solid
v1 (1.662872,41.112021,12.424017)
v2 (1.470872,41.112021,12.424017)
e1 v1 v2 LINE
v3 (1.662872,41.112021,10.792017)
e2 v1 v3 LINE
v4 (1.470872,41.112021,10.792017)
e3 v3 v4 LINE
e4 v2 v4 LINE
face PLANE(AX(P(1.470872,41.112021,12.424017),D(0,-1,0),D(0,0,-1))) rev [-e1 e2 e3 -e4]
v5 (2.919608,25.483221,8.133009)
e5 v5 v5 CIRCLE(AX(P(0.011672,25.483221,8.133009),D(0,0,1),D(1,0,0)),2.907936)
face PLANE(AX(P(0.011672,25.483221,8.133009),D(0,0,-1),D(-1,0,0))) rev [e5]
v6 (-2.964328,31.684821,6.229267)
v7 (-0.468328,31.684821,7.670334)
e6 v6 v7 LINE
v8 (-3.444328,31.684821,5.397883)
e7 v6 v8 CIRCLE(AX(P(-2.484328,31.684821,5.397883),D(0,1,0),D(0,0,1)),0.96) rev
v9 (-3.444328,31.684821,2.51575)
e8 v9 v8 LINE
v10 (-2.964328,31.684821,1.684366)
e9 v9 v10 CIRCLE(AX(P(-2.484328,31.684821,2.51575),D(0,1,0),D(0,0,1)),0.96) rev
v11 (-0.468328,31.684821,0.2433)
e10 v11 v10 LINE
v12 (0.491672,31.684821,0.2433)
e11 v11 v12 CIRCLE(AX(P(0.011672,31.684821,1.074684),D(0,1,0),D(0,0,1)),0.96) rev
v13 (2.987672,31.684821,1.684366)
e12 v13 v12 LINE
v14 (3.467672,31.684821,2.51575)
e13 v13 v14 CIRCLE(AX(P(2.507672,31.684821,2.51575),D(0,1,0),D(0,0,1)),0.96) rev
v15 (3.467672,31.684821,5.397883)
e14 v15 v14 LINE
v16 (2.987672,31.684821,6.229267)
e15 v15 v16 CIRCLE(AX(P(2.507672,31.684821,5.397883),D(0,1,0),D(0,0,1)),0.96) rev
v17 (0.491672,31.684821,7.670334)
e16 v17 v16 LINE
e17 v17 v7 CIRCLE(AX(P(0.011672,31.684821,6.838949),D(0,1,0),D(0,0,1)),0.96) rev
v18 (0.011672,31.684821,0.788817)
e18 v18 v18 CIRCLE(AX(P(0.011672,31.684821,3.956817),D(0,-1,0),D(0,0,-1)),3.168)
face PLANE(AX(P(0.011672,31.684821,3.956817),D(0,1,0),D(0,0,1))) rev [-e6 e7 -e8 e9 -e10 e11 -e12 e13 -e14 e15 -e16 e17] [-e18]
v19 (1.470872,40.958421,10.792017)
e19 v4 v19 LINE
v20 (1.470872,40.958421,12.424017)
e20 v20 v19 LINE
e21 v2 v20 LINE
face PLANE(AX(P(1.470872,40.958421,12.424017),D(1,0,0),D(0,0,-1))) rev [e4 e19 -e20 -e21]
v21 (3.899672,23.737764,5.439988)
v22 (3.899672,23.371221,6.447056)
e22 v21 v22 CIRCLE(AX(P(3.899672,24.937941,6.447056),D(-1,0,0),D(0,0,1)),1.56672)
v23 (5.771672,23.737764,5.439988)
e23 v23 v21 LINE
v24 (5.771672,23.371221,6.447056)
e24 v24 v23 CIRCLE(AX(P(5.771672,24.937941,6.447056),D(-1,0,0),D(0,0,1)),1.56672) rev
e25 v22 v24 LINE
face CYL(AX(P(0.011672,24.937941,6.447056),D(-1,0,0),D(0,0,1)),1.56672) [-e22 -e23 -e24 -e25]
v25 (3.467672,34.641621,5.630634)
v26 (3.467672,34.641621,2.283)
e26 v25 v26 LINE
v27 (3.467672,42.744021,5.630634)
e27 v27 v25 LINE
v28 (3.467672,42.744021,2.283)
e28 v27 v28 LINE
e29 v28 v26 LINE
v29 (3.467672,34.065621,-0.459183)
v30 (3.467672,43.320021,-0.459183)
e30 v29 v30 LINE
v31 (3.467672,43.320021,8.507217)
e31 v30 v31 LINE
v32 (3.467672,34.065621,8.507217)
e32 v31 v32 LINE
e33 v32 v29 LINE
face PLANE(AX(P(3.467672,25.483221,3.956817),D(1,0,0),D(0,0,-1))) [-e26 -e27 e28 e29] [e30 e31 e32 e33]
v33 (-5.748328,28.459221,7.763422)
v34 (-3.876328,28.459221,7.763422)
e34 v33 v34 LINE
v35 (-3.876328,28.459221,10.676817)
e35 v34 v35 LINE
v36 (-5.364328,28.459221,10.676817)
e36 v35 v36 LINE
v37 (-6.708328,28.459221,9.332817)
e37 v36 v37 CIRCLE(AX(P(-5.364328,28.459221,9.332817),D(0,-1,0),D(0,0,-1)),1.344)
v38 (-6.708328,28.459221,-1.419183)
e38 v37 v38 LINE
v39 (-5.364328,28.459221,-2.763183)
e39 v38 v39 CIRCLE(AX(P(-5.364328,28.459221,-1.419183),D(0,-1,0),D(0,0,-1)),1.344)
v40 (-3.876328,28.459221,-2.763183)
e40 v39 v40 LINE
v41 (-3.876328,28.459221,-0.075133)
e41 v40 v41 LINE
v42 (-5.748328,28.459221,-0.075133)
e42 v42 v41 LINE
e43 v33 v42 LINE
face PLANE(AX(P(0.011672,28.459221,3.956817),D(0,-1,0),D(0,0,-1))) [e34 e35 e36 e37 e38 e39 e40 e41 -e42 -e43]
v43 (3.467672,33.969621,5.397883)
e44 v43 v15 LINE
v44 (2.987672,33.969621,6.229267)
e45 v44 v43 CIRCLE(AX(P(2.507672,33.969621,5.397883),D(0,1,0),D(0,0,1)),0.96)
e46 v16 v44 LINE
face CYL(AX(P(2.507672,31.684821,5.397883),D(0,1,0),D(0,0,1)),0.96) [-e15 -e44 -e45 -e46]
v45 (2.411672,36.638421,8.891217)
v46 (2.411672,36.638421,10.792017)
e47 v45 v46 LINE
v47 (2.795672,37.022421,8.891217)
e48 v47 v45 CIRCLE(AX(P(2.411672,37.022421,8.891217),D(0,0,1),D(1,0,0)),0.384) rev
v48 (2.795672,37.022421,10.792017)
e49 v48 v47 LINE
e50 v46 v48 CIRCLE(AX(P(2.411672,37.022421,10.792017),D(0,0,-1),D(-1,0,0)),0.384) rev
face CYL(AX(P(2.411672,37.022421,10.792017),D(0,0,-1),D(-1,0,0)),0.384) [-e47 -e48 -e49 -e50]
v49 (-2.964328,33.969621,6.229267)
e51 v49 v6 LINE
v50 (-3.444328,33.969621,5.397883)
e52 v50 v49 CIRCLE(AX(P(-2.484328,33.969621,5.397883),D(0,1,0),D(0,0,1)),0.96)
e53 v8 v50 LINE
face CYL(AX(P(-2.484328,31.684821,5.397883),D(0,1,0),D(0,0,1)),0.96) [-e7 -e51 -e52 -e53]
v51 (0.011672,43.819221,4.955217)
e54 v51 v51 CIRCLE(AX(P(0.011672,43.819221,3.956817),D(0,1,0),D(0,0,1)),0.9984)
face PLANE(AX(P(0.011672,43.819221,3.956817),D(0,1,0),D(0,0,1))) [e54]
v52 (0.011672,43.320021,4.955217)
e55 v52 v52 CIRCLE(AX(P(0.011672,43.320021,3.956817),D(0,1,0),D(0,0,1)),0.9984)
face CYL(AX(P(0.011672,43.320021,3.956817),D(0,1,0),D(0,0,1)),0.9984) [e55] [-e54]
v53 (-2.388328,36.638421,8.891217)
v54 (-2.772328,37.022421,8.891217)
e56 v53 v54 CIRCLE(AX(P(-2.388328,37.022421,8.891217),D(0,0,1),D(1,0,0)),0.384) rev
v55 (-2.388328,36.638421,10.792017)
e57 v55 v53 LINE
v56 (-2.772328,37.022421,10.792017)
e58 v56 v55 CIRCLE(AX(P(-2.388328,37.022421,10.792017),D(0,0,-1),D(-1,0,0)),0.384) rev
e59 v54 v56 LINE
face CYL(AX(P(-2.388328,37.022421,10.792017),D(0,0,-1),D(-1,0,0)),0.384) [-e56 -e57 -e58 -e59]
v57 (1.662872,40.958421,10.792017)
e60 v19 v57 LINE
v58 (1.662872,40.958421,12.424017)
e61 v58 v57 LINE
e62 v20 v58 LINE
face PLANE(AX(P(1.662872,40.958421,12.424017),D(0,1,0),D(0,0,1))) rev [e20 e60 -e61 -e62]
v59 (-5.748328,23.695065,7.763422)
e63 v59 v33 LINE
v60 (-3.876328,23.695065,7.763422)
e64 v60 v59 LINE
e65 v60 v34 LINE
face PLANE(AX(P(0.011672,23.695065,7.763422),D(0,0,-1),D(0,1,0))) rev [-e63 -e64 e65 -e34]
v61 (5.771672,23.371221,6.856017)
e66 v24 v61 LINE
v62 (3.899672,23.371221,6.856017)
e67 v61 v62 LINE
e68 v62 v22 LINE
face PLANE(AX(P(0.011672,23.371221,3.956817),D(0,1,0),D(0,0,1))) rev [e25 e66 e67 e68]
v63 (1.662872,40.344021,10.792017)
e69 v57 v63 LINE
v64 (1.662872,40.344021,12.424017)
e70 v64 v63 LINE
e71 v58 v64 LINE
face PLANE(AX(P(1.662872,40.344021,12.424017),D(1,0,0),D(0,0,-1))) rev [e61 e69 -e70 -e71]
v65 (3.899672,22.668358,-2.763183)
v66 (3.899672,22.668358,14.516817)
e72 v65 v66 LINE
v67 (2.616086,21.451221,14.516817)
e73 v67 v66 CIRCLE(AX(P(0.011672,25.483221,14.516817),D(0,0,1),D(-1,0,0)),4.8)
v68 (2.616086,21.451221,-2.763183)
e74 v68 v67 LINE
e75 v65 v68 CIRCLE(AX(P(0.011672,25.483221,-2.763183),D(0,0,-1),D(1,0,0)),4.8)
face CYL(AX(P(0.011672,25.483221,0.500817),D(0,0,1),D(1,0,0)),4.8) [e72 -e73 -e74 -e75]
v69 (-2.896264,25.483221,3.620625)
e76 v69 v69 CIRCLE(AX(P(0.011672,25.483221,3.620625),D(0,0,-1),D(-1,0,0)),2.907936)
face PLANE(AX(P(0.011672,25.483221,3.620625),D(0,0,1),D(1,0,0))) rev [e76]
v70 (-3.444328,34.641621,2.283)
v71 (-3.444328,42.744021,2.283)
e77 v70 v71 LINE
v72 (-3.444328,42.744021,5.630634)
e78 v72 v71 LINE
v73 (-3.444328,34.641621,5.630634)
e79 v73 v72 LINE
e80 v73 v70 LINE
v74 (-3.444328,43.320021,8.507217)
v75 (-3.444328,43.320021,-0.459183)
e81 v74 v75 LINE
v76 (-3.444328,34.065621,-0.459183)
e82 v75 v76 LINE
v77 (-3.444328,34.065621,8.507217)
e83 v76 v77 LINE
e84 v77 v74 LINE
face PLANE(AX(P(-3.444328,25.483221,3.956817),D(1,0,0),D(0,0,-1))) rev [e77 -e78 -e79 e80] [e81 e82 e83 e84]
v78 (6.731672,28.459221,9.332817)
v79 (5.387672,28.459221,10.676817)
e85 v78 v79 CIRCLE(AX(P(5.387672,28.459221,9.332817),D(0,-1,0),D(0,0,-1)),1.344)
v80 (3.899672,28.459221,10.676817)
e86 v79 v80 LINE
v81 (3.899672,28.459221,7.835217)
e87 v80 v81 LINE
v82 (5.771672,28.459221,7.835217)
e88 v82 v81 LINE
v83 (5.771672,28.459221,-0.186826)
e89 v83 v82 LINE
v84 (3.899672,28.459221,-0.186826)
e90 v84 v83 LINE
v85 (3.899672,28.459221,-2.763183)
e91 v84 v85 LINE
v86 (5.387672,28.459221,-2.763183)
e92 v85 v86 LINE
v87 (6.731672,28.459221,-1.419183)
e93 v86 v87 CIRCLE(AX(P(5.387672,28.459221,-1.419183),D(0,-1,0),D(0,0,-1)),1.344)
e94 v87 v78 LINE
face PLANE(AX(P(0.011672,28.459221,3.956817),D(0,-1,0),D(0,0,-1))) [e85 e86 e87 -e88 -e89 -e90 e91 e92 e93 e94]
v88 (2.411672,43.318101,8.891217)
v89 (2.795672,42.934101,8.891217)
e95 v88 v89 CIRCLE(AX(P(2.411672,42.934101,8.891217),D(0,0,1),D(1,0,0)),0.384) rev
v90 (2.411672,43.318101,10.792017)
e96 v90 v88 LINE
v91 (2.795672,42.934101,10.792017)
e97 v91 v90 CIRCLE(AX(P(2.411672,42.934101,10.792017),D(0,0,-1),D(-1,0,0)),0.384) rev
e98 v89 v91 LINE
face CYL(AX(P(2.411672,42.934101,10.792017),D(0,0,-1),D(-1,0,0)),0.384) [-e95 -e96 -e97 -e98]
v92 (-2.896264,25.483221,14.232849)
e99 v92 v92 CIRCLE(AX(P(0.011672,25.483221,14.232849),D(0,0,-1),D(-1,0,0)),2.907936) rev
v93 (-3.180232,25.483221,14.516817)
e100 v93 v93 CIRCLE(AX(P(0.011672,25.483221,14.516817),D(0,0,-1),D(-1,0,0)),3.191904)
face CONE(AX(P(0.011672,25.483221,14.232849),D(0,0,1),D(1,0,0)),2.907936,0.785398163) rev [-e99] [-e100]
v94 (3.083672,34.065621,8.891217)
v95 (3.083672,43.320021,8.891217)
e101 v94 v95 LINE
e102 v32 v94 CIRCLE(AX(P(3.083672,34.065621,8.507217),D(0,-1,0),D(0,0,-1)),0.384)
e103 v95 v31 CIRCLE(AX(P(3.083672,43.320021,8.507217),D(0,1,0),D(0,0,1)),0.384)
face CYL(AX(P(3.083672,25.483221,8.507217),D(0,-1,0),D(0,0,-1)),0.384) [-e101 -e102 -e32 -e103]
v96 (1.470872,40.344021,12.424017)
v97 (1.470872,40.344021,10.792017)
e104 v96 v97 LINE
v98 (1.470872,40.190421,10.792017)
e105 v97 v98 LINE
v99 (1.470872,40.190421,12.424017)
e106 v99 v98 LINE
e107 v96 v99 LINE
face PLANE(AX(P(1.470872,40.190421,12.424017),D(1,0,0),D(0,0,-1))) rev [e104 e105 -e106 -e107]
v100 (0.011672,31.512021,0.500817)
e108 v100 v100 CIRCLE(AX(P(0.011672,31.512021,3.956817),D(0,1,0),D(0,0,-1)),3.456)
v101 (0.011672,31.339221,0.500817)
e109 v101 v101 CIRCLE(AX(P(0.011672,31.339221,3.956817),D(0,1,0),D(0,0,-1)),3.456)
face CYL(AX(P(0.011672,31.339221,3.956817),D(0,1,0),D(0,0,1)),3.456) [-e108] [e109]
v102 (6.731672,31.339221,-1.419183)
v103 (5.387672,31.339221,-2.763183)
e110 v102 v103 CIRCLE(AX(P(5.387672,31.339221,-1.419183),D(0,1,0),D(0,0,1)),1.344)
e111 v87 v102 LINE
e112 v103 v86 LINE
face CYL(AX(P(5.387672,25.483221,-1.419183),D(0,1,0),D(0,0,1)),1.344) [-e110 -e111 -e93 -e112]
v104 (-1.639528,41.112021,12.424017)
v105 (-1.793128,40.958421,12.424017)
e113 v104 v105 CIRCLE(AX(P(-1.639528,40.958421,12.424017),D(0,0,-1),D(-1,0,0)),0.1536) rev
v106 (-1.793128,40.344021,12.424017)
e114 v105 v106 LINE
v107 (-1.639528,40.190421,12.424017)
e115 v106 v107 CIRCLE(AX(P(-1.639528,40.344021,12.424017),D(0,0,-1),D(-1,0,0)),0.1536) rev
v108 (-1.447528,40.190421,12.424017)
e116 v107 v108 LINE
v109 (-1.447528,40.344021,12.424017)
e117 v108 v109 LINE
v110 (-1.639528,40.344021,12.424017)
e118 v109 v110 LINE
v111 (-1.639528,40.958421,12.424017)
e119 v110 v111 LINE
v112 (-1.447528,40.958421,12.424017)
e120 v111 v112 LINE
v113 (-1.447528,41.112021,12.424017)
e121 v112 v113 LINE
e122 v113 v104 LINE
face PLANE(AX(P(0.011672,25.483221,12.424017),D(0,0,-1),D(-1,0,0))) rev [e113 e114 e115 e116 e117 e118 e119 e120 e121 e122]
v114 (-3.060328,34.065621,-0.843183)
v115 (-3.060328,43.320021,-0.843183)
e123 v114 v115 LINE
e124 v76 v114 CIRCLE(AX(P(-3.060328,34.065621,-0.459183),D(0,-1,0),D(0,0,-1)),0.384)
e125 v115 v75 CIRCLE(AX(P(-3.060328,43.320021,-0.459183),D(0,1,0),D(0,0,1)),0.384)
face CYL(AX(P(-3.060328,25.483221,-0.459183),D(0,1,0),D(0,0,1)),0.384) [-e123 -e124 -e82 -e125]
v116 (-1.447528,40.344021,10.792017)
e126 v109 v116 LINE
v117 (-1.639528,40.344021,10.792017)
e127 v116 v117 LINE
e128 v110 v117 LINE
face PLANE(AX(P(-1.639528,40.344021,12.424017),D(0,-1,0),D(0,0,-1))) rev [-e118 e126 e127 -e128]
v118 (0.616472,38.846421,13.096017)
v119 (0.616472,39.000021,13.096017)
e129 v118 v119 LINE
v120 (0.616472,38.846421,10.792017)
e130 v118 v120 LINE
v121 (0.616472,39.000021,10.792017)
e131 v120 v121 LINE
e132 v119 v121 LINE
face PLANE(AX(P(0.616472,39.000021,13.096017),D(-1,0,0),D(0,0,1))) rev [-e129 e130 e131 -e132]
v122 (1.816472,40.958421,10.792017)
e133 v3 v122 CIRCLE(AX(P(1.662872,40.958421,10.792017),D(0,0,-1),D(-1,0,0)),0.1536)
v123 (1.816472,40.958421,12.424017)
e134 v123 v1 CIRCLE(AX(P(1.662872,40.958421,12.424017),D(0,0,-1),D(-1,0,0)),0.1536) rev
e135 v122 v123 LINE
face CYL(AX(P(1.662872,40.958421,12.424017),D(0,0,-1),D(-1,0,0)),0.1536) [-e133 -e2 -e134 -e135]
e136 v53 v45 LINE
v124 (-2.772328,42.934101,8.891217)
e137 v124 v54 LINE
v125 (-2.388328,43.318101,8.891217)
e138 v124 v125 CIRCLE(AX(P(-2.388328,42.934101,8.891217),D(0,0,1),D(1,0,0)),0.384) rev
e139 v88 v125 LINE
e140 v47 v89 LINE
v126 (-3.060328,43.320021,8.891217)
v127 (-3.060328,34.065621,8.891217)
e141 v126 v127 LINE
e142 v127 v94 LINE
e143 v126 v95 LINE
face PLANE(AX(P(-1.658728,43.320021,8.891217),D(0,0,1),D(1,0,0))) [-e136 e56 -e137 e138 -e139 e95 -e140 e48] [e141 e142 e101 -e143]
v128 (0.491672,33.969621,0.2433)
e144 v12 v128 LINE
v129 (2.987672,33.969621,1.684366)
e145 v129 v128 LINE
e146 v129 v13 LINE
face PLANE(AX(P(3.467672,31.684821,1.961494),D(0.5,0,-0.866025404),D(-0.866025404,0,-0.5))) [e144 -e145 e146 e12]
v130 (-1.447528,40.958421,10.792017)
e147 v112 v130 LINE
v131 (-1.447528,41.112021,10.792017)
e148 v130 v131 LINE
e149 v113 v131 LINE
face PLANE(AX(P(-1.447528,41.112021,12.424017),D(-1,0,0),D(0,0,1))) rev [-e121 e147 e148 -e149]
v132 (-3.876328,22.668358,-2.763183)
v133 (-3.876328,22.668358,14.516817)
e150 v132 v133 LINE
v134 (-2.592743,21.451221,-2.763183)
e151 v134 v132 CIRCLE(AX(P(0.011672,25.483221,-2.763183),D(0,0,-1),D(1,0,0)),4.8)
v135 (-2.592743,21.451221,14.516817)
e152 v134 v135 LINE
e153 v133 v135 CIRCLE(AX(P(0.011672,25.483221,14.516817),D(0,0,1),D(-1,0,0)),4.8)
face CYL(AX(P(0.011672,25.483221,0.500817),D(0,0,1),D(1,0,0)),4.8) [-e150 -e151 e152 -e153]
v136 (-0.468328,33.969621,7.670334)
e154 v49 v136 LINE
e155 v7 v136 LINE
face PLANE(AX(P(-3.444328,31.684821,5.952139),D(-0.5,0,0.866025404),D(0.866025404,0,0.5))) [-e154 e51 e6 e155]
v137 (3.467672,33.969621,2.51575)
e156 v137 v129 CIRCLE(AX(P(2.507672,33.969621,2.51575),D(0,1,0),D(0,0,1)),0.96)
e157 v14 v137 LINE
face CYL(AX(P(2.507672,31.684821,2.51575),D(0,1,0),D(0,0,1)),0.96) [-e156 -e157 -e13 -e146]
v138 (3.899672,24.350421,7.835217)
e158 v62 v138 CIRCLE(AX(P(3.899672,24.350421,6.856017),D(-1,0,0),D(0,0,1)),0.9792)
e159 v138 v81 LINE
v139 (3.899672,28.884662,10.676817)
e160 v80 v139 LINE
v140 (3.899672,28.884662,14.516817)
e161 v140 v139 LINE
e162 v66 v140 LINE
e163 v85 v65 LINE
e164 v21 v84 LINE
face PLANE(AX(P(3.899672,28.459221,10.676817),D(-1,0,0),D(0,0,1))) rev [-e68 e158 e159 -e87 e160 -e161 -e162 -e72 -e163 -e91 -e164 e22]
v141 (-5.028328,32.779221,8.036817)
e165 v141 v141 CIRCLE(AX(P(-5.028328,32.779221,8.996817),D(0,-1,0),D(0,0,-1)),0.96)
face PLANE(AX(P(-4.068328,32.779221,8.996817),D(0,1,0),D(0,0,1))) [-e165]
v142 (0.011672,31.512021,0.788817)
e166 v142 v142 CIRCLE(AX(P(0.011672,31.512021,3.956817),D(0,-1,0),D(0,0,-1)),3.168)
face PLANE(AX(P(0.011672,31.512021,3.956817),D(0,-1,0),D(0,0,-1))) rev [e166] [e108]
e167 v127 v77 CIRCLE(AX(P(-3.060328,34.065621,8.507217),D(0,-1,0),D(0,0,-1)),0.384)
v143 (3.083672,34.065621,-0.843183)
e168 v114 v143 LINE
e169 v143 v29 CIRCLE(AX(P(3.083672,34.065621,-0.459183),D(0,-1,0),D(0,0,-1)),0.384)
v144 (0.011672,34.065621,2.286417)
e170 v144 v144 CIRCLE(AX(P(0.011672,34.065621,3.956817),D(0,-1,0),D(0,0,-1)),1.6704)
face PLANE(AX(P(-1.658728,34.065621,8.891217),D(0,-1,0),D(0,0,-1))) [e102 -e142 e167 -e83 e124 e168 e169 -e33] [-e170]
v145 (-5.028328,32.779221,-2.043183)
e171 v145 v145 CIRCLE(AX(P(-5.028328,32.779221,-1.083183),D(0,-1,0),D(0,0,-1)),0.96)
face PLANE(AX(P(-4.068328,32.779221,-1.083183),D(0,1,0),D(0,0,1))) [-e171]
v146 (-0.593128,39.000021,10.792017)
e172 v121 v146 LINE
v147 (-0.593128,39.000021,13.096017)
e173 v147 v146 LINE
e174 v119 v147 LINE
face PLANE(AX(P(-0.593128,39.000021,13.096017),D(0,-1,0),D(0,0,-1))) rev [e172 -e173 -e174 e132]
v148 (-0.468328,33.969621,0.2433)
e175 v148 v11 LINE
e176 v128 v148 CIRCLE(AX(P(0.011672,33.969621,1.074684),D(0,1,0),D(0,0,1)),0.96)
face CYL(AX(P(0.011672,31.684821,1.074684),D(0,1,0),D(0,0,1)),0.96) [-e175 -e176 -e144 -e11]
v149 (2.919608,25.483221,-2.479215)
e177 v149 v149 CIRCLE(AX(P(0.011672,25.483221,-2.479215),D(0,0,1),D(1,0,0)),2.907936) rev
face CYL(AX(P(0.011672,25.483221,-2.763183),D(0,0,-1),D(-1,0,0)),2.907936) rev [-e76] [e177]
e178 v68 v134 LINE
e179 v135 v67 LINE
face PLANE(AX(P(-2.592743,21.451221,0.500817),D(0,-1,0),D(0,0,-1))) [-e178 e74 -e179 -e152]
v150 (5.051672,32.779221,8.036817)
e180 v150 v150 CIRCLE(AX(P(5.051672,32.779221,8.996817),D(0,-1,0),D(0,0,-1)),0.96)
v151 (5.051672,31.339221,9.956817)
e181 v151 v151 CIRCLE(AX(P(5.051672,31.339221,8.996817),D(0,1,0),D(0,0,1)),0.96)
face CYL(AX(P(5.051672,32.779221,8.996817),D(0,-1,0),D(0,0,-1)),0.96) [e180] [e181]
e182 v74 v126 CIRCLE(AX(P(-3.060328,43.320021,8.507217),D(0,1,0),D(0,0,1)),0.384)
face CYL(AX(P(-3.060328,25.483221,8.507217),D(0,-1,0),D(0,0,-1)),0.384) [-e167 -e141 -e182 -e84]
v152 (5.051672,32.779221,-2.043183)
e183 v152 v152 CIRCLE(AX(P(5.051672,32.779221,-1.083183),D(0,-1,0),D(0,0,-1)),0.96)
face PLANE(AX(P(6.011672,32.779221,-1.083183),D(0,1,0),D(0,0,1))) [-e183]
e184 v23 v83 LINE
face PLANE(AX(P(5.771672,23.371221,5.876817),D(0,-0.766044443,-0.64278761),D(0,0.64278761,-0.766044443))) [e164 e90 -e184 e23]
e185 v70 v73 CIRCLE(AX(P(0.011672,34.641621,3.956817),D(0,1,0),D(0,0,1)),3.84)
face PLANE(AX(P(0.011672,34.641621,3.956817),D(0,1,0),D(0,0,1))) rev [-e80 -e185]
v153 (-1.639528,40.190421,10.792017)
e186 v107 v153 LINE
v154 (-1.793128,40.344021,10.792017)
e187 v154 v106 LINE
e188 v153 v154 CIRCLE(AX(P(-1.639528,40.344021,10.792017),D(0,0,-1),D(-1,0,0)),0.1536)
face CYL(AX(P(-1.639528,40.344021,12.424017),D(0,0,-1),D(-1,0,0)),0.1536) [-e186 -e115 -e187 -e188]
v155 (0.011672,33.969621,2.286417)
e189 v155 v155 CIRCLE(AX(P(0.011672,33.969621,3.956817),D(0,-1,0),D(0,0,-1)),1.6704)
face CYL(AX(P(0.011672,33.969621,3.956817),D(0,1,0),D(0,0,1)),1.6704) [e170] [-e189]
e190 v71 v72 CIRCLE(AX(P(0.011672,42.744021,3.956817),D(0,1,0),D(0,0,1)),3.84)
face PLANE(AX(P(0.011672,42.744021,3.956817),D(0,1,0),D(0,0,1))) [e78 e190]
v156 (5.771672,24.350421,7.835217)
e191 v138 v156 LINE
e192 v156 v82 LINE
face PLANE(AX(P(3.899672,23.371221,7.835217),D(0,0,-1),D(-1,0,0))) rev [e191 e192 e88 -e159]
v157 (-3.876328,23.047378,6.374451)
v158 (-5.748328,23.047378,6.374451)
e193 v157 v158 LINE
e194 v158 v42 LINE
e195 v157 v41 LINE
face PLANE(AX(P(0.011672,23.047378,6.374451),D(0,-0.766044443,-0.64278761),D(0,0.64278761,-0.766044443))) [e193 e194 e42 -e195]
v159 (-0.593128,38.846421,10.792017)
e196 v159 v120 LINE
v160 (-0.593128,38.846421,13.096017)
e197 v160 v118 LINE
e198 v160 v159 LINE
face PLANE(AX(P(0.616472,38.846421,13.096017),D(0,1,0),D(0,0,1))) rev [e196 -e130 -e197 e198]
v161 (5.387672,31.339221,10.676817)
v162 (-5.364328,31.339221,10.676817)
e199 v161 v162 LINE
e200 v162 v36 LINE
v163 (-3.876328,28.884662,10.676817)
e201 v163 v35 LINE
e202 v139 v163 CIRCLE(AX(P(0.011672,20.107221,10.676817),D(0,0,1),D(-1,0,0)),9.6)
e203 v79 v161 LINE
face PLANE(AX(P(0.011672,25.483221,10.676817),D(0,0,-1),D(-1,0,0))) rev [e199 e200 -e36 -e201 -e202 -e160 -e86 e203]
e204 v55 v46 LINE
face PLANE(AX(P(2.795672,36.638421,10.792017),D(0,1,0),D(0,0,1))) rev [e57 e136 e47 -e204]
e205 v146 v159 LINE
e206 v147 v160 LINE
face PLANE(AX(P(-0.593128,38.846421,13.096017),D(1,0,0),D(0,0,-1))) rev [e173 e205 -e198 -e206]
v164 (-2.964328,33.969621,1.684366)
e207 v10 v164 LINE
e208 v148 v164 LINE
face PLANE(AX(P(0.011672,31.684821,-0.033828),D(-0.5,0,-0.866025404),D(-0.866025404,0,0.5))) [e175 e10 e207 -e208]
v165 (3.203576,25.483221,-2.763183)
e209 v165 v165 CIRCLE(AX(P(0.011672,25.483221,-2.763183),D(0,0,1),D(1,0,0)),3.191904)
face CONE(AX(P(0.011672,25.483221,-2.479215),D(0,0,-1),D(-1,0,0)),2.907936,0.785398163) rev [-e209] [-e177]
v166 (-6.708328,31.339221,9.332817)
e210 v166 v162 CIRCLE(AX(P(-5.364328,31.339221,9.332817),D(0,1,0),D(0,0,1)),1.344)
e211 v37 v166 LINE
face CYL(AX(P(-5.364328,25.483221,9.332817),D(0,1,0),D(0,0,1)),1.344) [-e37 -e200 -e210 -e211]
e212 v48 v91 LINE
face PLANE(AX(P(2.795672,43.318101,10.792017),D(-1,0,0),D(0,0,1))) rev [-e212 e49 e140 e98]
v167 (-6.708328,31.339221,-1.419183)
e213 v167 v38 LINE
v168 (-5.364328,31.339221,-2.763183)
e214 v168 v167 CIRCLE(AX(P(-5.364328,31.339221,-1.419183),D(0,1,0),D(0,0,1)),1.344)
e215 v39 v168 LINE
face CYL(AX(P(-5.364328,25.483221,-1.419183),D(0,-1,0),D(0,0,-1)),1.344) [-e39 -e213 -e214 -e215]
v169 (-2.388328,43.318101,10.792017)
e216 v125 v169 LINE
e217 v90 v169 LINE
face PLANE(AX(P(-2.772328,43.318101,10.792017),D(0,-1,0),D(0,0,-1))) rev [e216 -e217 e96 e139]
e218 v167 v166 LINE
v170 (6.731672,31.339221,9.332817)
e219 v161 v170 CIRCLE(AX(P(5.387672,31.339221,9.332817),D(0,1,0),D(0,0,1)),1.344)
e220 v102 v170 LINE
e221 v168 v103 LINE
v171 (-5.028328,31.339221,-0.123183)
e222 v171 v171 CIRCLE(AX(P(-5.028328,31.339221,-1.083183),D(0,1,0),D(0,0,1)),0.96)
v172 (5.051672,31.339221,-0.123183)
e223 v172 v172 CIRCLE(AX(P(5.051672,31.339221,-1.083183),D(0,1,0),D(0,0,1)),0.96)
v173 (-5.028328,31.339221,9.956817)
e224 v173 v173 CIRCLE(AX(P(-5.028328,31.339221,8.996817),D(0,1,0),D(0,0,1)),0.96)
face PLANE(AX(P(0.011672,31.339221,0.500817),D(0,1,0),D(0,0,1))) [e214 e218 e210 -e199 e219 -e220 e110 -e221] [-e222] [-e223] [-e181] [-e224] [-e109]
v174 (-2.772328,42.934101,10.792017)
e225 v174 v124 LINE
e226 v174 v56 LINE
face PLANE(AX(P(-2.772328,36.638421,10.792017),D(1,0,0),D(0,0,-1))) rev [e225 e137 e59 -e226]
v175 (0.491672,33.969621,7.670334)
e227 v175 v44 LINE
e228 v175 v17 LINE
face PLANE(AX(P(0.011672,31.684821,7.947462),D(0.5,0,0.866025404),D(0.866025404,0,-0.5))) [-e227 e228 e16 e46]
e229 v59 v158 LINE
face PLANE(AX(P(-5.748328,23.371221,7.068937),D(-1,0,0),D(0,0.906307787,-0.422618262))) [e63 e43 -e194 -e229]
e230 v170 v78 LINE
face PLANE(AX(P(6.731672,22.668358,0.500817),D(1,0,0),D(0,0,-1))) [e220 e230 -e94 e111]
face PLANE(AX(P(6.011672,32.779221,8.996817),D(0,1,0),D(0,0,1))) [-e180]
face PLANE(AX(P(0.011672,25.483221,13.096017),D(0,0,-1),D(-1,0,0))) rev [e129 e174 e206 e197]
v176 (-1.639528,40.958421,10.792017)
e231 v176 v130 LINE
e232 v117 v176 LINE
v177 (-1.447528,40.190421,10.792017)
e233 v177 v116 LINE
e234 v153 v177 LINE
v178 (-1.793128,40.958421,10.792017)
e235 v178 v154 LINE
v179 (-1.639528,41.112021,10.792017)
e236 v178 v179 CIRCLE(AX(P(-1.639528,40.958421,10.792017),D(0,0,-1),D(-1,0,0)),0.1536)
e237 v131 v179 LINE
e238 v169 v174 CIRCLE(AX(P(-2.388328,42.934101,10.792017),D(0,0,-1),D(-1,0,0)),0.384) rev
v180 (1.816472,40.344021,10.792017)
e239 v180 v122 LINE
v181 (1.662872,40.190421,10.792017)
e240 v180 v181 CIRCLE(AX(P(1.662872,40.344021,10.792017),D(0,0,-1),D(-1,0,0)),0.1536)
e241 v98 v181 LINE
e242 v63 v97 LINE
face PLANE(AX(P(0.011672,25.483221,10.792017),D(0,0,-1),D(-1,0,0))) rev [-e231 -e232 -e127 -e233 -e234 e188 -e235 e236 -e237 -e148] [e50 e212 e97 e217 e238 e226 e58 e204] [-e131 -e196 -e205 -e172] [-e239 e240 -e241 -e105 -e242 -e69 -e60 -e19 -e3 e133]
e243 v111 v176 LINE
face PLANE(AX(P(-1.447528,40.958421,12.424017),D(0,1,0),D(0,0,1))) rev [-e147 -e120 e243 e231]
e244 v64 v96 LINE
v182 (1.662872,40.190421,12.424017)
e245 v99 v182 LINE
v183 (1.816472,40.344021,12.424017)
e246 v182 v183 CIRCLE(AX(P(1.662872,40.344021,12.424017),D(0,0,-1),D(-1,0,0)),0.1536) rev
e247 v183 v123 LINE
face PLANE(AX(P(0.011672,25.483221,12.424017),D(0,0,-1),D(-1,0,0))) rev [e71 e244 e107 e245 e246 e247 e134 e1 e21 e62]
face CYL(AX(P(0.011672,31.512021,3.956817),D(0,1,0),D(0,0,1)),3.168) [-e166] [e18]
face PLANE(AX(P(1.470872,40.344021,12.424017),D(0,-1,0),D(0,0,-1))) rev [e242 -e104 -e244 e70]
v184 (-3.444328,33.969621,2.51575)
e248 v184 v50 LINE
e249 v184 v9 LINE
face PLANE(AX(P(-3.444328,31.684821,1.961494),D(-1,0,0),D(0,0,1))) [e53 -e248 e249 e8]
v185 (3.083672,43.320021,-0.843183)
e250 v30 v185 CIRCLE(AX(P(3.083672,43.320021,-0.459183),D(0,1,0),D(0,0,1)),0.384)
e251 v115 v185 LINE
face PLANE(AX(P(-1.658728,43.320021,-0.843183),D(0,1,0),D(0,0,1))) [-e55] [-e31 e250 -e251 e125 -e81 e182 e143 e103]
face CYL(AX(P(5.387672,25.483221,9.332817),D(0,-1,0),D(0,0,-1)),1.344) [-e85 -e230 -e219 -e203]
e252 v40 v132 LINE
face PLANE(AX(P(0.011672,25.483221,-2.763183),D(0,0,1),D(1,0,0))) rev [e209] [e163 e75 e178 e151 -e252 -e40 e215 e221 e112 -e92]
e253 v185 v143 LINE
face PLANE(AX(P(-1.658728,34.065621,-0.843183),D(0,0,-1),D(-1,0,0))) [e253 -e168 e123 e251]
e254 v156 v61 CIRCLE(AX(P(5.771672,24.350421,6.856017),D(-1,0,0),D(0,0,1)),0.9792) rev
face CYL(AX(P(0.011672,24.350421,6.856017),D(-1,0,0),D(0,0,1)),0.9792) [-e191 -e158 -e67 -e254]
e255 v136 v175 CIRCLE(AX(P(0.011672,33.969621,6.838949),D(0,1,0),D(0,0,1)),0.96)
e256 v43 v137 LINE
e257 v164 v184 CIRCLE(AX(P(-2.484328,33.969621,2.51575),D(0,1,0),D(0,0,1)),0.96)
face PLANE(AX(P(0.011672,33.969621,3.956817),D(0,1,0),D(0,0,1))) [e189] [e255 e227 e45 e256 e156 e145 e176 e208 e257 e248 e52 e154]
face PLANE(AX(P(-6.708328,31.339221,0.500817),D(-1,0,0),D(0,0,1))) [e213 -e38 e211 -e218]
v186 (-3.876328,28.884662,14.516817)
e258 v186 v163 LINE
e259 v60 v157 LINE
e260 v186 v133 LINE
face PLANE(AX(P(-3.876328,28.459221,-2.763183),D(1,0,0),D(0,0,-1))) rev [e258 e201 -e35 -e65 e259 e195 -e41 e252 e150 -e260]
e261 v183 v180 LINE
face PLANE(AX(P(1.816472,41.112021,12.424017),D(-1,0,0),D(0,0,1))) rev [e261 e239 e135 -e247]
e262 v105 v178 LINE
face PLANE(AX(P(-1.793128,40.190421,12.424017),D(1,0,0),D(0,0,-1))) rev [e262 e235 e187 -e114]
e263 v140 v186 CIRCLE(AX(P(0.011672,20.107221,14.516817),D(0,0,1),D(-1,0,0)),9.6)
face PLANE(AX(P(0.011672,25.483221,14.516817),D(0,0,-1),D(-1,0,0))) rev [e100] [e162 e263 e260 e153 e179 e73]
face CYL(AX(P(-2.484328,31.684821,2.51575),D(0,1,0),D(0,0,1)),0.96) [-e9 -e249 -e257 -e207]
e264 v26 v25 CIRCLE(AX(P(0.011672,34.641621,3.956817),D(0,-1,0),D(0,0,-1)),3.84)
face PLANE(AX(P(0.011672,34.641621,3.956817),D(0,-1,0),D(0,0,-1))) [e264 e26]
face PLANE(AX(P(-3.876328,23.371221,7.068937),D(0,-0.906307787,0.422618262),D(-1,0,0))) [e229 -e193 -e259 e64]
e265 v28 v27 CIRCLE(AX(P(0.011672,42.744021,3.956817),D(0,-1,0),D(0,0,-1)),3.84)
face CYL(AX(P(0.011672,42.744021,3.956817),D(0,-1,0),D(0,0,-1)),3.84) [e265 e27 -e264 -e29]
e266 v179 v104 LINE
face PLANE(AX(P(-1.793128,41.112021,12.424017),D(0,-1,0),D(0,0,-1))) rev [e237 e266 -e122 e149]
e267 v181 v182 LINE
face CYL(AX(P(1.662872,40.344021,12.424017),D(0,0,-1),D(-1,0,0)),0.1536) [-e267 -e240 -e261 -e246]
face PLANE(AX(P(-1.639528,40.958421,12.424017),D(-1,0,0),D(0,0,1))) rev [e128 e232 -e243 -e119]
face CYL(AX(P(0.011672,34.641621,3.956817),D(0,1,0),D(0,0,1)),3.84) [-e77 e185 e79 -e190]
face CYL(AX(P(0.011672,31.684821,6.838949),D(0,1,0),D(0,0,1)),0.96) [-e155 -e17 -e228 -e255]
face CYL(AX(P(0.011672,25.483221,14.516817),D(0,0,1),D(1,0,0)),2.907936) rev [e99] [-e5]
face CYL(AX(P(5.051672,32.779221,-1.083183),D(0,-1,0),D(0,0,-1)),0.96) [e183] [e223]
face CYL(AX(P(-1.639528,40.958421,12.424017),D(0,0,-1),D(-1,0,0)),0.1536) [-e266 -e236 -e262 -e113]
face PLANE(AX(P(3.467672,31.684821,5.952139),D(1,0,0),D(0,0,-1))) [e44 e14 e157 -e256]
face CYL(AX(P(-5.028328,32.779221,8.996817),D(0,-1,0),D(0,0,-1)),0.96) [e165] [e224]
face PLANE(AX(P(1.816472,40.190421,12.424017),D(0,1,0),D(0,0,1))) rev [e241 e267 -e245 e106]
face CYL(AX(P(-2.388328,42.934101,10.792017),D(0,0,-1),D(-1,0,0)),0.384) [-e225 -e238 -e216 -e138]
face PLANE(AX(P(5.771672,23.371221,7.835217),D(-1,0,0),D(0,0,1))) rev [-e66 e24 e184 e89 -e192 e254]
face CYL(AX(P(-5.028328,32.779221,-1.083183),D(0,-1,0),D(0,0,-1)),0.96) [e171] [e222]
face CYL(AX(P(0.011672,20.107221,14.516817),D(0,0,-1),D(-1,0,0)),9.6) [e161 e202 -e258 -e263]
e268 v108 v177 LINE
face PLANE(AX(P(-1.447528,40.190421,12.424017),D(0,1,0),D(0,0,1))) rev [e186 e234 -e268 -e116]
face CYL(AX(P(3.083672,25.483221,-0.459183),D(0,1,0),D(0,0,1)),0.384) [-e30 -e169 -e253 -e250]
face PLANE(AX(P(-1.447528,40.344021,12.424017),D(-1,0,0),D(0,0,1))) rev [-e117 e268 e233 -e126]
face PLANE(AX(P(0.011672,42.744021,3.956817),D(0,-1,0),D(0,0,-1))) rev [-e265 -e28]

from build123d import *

# Parameters (mm, degrees)
IZIM1_W                      = 50.7
IZIM1_H                      = 48.2
Y_KSEKLIK_EKSTR_ZYON1_DEPTH  = 26.7
IZIM2_R                      = 8.7
Y_KSEKLIK_EKSTR_ZYON2_DEPTH  = 0.5
Y_KSEKLIK_EKSTR_ZYON3_DEPTH  = 11.9
IZIM4_R                      = 16.5
Y_KSEKLIK_EKSTR_ZYON4_DEPTH  = 0.9
IZIM5_R                      = 18
Y_KSEKLIK_EKSTR_ZYON5_DEPTH  = 0.9
Y_KSEKLIK_EKSTR_ZYON6_DEPTH  = 36
Y_KSEKLIK_EKSTR_ZYON7_DEPTH  = 17
Y_KSEKLIK_EKSTR_ZYON8_START  = 17
Y_KSEKLIK_EKSTR_ZYON8_DEPTH  = 17
IZIM9_W                      = 14.75
IZIM9_H                      = 70
KES_EKSTR_ZYON1_DEPTH        = 30.160746911
IZIM10_W                     = 14.75
IZIM10_H                     = 70
KES_EKSTR_ZYON2_DEPTH        = 30.160746911
IZIM11_W                     = 50.7
IZIM11_H                     = 48.2
Y_KSEKLIK_EKSTR_ZYON9_DEPTH  = 9.3
Y_KSEKLIK_EKSTR_ZYON10_START = 20
Y_KSEKLIK_EKSTR_ZYON10_DEPTH = 20
IZIM13_W                     = 9.75
IZIM13_H                     = 10.2
Y_KSEKLIK_EKSTR_ZYON11_DEPTH = 26.5
Y_KSEKLIK_EKSTR_ZYON12_DEPTH = 42.2
Y_KSEKLIK_EKSTR_ZYON13_START = -42.2
Y_KSEKLIK_EKSTR_ZYON13_DEPTH = 42.2
IZIM16_W                     = 29
IZIM16_H                     = 34.79
Y_KSEKLIK_EKSTR_ZYON14_DEPTH = 9.9
Y_KSEKLIK_EKSTR_ZYON15_DEPTH = 8.5
Y_KSEKLIK_EKSTR_ZYON16_DEPTH = 8.5
IZIM19_W                     = 6.3
IZIM19_H                     = 0.8
Y_KSEKLIK_EKSTR_ZYON17_DEPTH = 12
DRAFT1_ANGLE                 = 50
IZIM20_W                     = 5
IZIM20_H                     = 7.5
IZIM21_W                     = 5
IZIM21_H                     = 7.5
IZIM22_W                     = 5
IZIM22_H                     = 7.5
IZIM23_W                     = 5
IZIM23_H                     = 7.5
IZIM24_W                     = 5.2
IZIM24_H                     = 2.6
M27_BO_LUKLU_DELIK1_D        = 30.291
M27_BO_LUKLU_DELIK1_DEPTH    = 33.249
M27_BO_LUKLU_DELIK2_D        = 30.291
M27_BO_LUKLU_DELIK2_DEPTH    = 33.249
FEDER1_START                 = -30
FEDER1_DEPTH                 = 9.75
PAH1_SIZE                    = 1.479
RADYUS1_R                    = 0.8
RADYUS2_R                    = 2
RADYUS3_R                    = 5
RADYUS4_R                    = 5.1
RADYUS5_R                    = 7
RADYUS6_R                    = 8.16
L_EK1_SCALE                  = 0.192


# Read off the part's stored shape, not the designer's step: Feder1
with BuildPart() as part:
    # Çizim1 → Yükseklik-Ekstrüzyon1 (new body)
    with BuildSketch(Plane(origin=(18, 0, 0), x_dir=(0, 0, -1), z_dir=(1, 0, 0))):
        with Locations((-0.35, 68.8)):
            Rectangle(IZIM1_W, IZIM1_H)
    extrude(amount=-Y_KSEKLIK_EKSTR_ZYON1_DEPTH)

    # Çizim2 → Yükseklik-Ekstrüzyon2 (add)
    with BuildSketch(Plane.XZ.offset(-44.7)):
        with Locations(Location((0, 0, 0), (0, 0, 180))):
            Circle(IZIM2_R)
    extrude(amount=Y_KSEKLIK_EKSTR_ZYON2_DEPTH)

    # Çizim3 → Yükseklik-Ekstrüzyon3 (add)
    with BuildSketch(Plane(origin=(0, 44.2, 0), x_dir=(1, 0, 0), z_dir=(0, 1, 0))):
        Polygon((-18, 10.392304845), (-18, -10.392304845), (0, -20.784609691), (18, -10.392304845), (18, 10.392304845), (0, 20.784609691), align=None)
    extrude(amount=-Y_KSEKLIK_EKSTR_ZYON3_DEPTH)

    # Çizim4 → Yükseklik-Ekstrüzyon4 (add)
    with BuildSketch(Plane.XZ.offset(-32.3)):
        with Locations(Location((0, 0, 0), (0, 0, 270))):
            Circle(IZIM4_R)
    extrude(amount=Y_KSEKLIK_EKSTR_ZYON4_DEPTH)

    # Çizim5 → Yükseklik-Ekstrüzyon5 (add)
    with BuildSketch(Plane(origin=(0, 31.4, 0), x_dir=(1, 0, 0), z_dir=(0, 1, 0))):
        with Locations(Location((0, 0, 0), (0, 0, 90))):
            Circle(IZIM5_R)
    extrude(amount=-Y_KSEKLIK_EKSTR_ZYON5_DEPTH)

    # Çizim6 → Yükseklik-Ekstrüzyon6 (add)
    with BuildSketch(Plane.XY.offset(18)):
        with BuildLine():
            Line((-13.564659966, -21), (13.564659966, -21))
            ThreePointArc((13.564659966, -21), (17.201870235, -18.14099392), (20.25, -14.660746911))
            Line((20.25, -14.660746911), (35, -14.660746911))
            Line((35, -14.660746911), (35, 30.5))
            Line((35, 30.5), (0, 30.5))
            Line((0, 30.5), (-35, 30.5))
            Line((-35, 30.5), (-35, -14.660746911))
            Line((-35, -14.660746911), (-20.25, -14.660746911))
            ThreePointArc((-20.25, -14.660746911), (-17.201870235, -18.14099392), (-13.564659966, -21))
        make_face()
    extrude(amount=-Y_KSEKLIK_EKSTR_ZYON6_DEPTH)

    # Çizim7 → Yükseklik-Ekstrüzyon7 (add)
    with BuildSketch(Plane(origin=(0, 0, -18), x_dir=(-1, 0, 0), z_dir=(0, 0, -1))):
        with BuildLine():
            Line((13.564659966, -21), (-13.564659966, -21))
            ThreePointArc((-13.564659966, -21), (-17.201870235, -18.14099392), (-20.25, -14.660746911))
            Line((-20.25, -14.660746911), (-35, -14.660746911))
            Line((-35, -14.660746911), (-35, 30.5))
            Line((-35, 30.5), (35, 30.5))
            Line((35, 30.5), (35, -14.660746911))
            Line((35, -14.660746911), (20.25, -14.660746911))
            ThreePointArc((20.25, -14.660746911), (17.201870235, -18.14099392), (13.564659966, -21))
        make_face()
    extrude(amount=Y_KSEKLIK_EKSTR_ZYON7_DEPTH)

    # Çizim8 → Yükseklik-Ekstrüzyon8 (add)
    with BuildSketch(Plane.XY.offset(18).offset(Y_KSEKLIK_EKSTR_ZYON8_START)):
        with BuildLine():
            Line((13.564659966, -21), (-13.564659966, -21))
            ThreePointArc((-13.564659966, -21), (-17.201870235, -18.14099392), (-20.25, -14.660746911))
            Line((-20.25, -14.660746911), (-35, -14.660746911))
            Line((-35, -14.660746911), (-35, 30.5))
            Line((-35, 30.5), (35, 30.5))
            Line((35, 30.5), (35, -14.660746911))
            Line((35, -14.660746911), (20.25, -14.660746911))
            ThreePointArc((20.25, -14.660746911), (17.201870235, -18.14099392), (13.564659966, -21))
        make_face()
    extrude(amount=-Y_KSEKLIK_EKSTR_ZYON8_DEPTH)

    # Çizim9 → Kes-Ekstrüzyon1 (cut)
    with BuildSketch(Plane.XZ.offset(14.660746911)):
        with Locations((27.625, 0)):
            Rectangle(IZIM9_W, IZIM9_H)
    extrude(amount=-KES_EKSTR_ZYON1_DEPTH, mode=Mode.SUBTRACT)

    # Çizim10 → Kes-Ekstrüzyon2 (cut)
    with BuildSketch(Plane.XZ.offset(14.660746911)):
        with Locations((-27.625, 0)):
            Rectangle(IZIM10_W, IZIM10_H)
    extrude(amount=-KES_EKSTR_ZYON2_DEPTH, mode=Mode.SUBTRACT)

    # Çizim11 → Yükseklik-Ekstrüzyon9 (add)
    with BuildSketch(Plane.ZY.offset(8.7)):
        with Locations((0.35, 68.8)):
            Rectangle(IZIM11_W, IZIM11_H)
    extrude(amount=Y_KSEKLIK_EKSTR_ZYON9_DEPTH)

    # Çizim12 → Yükseklik-Ekstrüzyon10 (add)
    with BuildSketch(Plane.XY.offset(35).offset(Y_KSEKLIK_EKSTR_ZYON10_START)):
        with BuildLine():
            Line((-20.25, -14.660746911), (-20.25, 17.715834237))
            ThreePointArc((-20.25, 17.715834237), (0, 22), (20.25, 17.715834237))
            Line((20.25, 17.715834237), (20.25, -14.660746911))
            ThreePointArc((20.25, -14.660746911), (17.201870235, -18.14099392), (13.564659966, -21))
            Line((13.564659966, -21), (-13.564659966, -21))
            ThreePointArc((-13.564659966, -21), (-17.201870235, -18.14099392), (-20.25, -14.660746911))
        make_face()
    extrude(amount=-Y_KSEKLIK_EKSTR_ZYON10_DEPTH)

    # Çizim13 → Yükseklik-Ekstrüzyon11 (add)
    with BuildSketch(Plane.XZ.offset(-15.5)):
        with Locations((25.125, 15.1)):
            Rectangle(IZIM13_W, IZIM13_H)
    extrude(amount=Y_KSEKLIK_EKSTR_ZYON11_DEPTH)

    # Çizim14 → Yükseklik-Ekstrüzyon12 (add)
    with BuildSketch(Plane(origin=(0, 89.9, 0), x_dir=(1, 0, 0), z_dir=(0, 1, 0))):
        with BuildLine():
            Line((-18, -8.717797887), (-18, 8.717797887))
            ThreePointArc((-18, 8.717797887), (-20, 0), (-18, -8.717797887))
        make_face()
    extrude(amount=-Y_KSEKLIK_EKSTR_ZYON12_DEPTH)

    # Çizim15 → Yükseklik-Ekstrüzyon13 (add)
    with BuildSketch(Plane.XZ.offset(-47.7).offset(Y_KSEKLIK_EKSTR_ZYON13_START)):
        with BuildLine():
            Line((18, 8.717797887), (18, -8.717797887))
            ThreePointArc((18, -8.717797887), (20, 0), (18, 8.717797887))
        make_face()
    extrude(amount=Y_KSEKLIK_EKSTR_ZYON13_DEPTH)

    # Çizim16 → Yükseklik-Ekstrüzyon14 (add)
    with BuildSketch(Plane.XY.offset(25.7)):
        with Locations((0, 75.495)):
            Rectangle(IZIM16_W, IZIM16_H)
    extrude(amount=Y_KSEKLIK_EKSTR_ZYON14_DEPTH)

    # Çizim17 → Yükseklik-Ekstrüzyon15 (add)
    with BuildSketch(Plane.XY.offset(35.6)):
        Polygon((-9.4, 81.4), (-7.6, 81.4), (-7.6, 80.6), (-8.6, 80.6), (-8.6, 77.4), (-7.6, 77.4), (-7.6, 76.6), (-9.4, 76.6), align=None)
    extrude(amount=Y_KSEKLIK_EKSTR_ZYON15_DEPTH)

    # Çizim18 → Yükseklik-Ekstrüzyon16 (add)
    with BuildSketch(Plane.XY.offset(35.6)):
        Polygon((7.6, 77.4), (8.6, 77.4), (8.6, 80.6), (7.6, 80.6), (7.6, 81.4), (9.4, 81.4), (9.4, 76.6), (7.6, 76.6), align=None)
    extrude(amount=Y_KSEKLIK_EKSTR_ZYON16_DEPTH)

    # Çizim19 → Yükseklik-Ekstrüzyon17 (add)
    with BuildSketch(Plane.XY.offset(35.6)):
        with Locations((0, 70)):
            Rectangle(IZIM19_W, IZIM19_H)
    extrude(amount=Y_KSEKLIK_EKSTR_ZYON17_DEPTH)

    # Draft1
    draft1_faces = [part.faces().sort_by_distance(p)[0] for p in [
        (25.125, 2.25, 10),
    ]]
    draft(draft1_faces, Plane(origin=(0, -11, 0), x_dir=(0, 0, -1), z_dir=(0, -1, 0)), DRAFT1_ANGLE)

    # Çizim20 → Döndür1 (revolve)
    with BuildSketch(Plane.XY.offset(26.25), mode=Mode.PRIVATE) as d_nd_r1_sk:
        with Locations((-23.75, 34.25)):
            Rectangle(IZIM20_W, IZIM20_H)
    revolve(d_nd_r1_sk.sketch.rotate(Axis((-26.25, 38, 26.25), (0, -1, 0)), 270), axis=Axis((-26.25, 38, 26.25), (0, -1, 0)))

    # Çizim21 → Döndür2 (revolve)
    with BuildSketch(Plane.XY.offset(-26.25), mode=Mode.PRIVATE) as d_nd_r2_sk:
        with Locations((-23.75, 34.25)):
            Rectangle(IZIM21_W, IZIM21_H)
    revolve(d_nd_r2_sk.sketch.rotate(Axis((-26.25, 38, -26.25), (0, -1, 0)), 270), axis=Axis((-26.25, 38, -26.25), (0, -1, 0)))

    # Çizim22 → Döndür3 (revolve)
    with BuildSketch(Plane.XY.offset(-26.25), mode=Mode.PRIVATE) as d_nd_r3_sk:
        with Locations((28.75, 34.25)):
            Rectangle(IZIM22_W, IZIM22_H)
    revolve(d_nd_r3_sk.sketch.rotate(Axis((26.25, 38, -26.25), (0, -1, 0)), 270), axis=Axis((26.25, 38, -26.25), (0, -1, 0)))

    # Çizim23 → Döndür4 (revolve)
    with BuildSketch(Plane.XY.offset(26.25), mode=Mode.PRIVATE) as d_nd_r4_sk:
        with Locations((28.75, 34.25)):
            Rectangle(IZIM23_W, IZIM23_H)
    revolve(d_nd_r4_sk.sketch.rotate(Axis((26.25, 38, 26.25), (0, -1, 0)), 270), axis=Axis((26.25, 38, 26.25), (0, -1, 0)))

    # Çizim24 → Döndür5 (revolve)
    with BuildSketch(Plane(origin=(0, 0, 0), x_dir=(-1, 0, 0), z_dir=(0, 0, -1)), mode=Mode.PRIVATE) as d_nd_r5_sk:
        with Locations((-2.6, 94.2)):
            Rectangle(IZIM24_W, IZIM24_H)
    revolve(d_nd_r5_sk.sketch.rotate(Axis((0, 92.9, 0), (0, 1, 0)), 90), axis=Axis((0, 92.9, 0), (0, 1, 0)))

    # M27 Boşluklu Delik1
    with Locations(Plane.XY.offset(55)):
        with Locations((0, 0)):
            Hole(M27_BO_LUKLU_DELIK1_D / 2, depth=M27_BO_LUKLU_DELIK1_DEPTH)

    # M27 Boşluklu Delik2
    with Locations(Plane(origin=(0, 0, -35), x_dir=(-1, 0, 0), z_dir=(0, 0, -1))):
        with Locations((0, 0)):
            Hole(M27_BO_LUKLU_DELIK2_D / 2, depth=M27_BO_LUKLU_DELIK2_DEPTH)

    # Feder1 outline → Feder1 (add)
    with BuildSketch(Plane.YZ.offset(FEDER1_START)):
        Polygon((15.5, 19.826070485), (-9.313312955, 19.826070485), (-12.686687045, 12.591846402), (15.5, -20.999739147), align=None)
    extrude(amount=FEDER1_DEPTH)

    # Pah1
    pah1_edges = [part.edges().sort_by_distance(p)[0] for p in [
        (15.1455, 0, 55),
        (-15.1455, 0, -35),
    ]]
    chamfer(pah1_edges, length=PAH1_SIZE)

    # Radyus1
    radyus1_edges = [part.edges().sort_by_distance(p)[0] for p in [
        (-9.4, 81.4, 39.85),
        (-9.4, 76.6, 39.85),
        (9.4, 76.6, 39.85),
        (9.4, 81.4, 39.85),
    ]]
    fillet(radyus1_edges, radius=RADYUS1_R)

    # Radyus2
    radyus2_edges = [part.edges().sort_by_distance(p)[0] for p in [
        (-18, 68.8, -25),
        (-18, 68.8, 25.7),
        (-14.5, 92.89, 30.65),
        (-14.5, 58.1, 30.65),
        (14.5, 58.1, 30.65),
        (14.5, 92.89, 30.65),
        (18, 68.8, 25.7),
        (18, 68.8, -25),
    ]]
    fillet(radyus2_edges, radius=RADYUS2_R)

    # Radyus3
    radyus3_edges = [part.edges().sort_by_distance(p)[0] for p in [
        (-18, 38.25, -10.392304845),
        (0, 38.25, -20.784609691),
        (18, 38.25, -10.392304845),
        (18, 38.25, 10.392304845),
        (0, 38.25, 20.784609691),
        (-18, 38.25, 10.392304845),
    ]]
    fillet(radyus3_edges, radius=RADYUS3_R)

    # Radyus4
    radyus4_edges = [part.edges().sort_by_distance(p)[0] for p in [
        (25.125, -11, 20.2),
    ]]
    fillet(radyus4_edges, radius=RADYUS4_R)

    # Radyus5
    radyus5_edges = [part.edges().sort_by_distance(p)[0] for p in [
        (35, 23, 35),
        (-35, 23, -35),
        (35, 23, -35),
        (-35, 23, 35),
    ]]
    fillet(radyus5_edges, radius=RADYUS5_R)

    # Radyus6
    radyus6_edges = [part.edges().sort_by_distance(p)[0] for p in [
        (25.125, -11, 10),
    ]]
    fillet(radyus6_edges, radius=RADYUS6_R)


with BuildPart() as part_1:
    # Ölçek1: scaled about (0.014445195, 31.538640435, 4.897050437)
    add(part.part.scale(L_EK1_SCALE).moved(Location((0.011671718, 25.483221471, 3.956816753))))


solid = part_1.part
